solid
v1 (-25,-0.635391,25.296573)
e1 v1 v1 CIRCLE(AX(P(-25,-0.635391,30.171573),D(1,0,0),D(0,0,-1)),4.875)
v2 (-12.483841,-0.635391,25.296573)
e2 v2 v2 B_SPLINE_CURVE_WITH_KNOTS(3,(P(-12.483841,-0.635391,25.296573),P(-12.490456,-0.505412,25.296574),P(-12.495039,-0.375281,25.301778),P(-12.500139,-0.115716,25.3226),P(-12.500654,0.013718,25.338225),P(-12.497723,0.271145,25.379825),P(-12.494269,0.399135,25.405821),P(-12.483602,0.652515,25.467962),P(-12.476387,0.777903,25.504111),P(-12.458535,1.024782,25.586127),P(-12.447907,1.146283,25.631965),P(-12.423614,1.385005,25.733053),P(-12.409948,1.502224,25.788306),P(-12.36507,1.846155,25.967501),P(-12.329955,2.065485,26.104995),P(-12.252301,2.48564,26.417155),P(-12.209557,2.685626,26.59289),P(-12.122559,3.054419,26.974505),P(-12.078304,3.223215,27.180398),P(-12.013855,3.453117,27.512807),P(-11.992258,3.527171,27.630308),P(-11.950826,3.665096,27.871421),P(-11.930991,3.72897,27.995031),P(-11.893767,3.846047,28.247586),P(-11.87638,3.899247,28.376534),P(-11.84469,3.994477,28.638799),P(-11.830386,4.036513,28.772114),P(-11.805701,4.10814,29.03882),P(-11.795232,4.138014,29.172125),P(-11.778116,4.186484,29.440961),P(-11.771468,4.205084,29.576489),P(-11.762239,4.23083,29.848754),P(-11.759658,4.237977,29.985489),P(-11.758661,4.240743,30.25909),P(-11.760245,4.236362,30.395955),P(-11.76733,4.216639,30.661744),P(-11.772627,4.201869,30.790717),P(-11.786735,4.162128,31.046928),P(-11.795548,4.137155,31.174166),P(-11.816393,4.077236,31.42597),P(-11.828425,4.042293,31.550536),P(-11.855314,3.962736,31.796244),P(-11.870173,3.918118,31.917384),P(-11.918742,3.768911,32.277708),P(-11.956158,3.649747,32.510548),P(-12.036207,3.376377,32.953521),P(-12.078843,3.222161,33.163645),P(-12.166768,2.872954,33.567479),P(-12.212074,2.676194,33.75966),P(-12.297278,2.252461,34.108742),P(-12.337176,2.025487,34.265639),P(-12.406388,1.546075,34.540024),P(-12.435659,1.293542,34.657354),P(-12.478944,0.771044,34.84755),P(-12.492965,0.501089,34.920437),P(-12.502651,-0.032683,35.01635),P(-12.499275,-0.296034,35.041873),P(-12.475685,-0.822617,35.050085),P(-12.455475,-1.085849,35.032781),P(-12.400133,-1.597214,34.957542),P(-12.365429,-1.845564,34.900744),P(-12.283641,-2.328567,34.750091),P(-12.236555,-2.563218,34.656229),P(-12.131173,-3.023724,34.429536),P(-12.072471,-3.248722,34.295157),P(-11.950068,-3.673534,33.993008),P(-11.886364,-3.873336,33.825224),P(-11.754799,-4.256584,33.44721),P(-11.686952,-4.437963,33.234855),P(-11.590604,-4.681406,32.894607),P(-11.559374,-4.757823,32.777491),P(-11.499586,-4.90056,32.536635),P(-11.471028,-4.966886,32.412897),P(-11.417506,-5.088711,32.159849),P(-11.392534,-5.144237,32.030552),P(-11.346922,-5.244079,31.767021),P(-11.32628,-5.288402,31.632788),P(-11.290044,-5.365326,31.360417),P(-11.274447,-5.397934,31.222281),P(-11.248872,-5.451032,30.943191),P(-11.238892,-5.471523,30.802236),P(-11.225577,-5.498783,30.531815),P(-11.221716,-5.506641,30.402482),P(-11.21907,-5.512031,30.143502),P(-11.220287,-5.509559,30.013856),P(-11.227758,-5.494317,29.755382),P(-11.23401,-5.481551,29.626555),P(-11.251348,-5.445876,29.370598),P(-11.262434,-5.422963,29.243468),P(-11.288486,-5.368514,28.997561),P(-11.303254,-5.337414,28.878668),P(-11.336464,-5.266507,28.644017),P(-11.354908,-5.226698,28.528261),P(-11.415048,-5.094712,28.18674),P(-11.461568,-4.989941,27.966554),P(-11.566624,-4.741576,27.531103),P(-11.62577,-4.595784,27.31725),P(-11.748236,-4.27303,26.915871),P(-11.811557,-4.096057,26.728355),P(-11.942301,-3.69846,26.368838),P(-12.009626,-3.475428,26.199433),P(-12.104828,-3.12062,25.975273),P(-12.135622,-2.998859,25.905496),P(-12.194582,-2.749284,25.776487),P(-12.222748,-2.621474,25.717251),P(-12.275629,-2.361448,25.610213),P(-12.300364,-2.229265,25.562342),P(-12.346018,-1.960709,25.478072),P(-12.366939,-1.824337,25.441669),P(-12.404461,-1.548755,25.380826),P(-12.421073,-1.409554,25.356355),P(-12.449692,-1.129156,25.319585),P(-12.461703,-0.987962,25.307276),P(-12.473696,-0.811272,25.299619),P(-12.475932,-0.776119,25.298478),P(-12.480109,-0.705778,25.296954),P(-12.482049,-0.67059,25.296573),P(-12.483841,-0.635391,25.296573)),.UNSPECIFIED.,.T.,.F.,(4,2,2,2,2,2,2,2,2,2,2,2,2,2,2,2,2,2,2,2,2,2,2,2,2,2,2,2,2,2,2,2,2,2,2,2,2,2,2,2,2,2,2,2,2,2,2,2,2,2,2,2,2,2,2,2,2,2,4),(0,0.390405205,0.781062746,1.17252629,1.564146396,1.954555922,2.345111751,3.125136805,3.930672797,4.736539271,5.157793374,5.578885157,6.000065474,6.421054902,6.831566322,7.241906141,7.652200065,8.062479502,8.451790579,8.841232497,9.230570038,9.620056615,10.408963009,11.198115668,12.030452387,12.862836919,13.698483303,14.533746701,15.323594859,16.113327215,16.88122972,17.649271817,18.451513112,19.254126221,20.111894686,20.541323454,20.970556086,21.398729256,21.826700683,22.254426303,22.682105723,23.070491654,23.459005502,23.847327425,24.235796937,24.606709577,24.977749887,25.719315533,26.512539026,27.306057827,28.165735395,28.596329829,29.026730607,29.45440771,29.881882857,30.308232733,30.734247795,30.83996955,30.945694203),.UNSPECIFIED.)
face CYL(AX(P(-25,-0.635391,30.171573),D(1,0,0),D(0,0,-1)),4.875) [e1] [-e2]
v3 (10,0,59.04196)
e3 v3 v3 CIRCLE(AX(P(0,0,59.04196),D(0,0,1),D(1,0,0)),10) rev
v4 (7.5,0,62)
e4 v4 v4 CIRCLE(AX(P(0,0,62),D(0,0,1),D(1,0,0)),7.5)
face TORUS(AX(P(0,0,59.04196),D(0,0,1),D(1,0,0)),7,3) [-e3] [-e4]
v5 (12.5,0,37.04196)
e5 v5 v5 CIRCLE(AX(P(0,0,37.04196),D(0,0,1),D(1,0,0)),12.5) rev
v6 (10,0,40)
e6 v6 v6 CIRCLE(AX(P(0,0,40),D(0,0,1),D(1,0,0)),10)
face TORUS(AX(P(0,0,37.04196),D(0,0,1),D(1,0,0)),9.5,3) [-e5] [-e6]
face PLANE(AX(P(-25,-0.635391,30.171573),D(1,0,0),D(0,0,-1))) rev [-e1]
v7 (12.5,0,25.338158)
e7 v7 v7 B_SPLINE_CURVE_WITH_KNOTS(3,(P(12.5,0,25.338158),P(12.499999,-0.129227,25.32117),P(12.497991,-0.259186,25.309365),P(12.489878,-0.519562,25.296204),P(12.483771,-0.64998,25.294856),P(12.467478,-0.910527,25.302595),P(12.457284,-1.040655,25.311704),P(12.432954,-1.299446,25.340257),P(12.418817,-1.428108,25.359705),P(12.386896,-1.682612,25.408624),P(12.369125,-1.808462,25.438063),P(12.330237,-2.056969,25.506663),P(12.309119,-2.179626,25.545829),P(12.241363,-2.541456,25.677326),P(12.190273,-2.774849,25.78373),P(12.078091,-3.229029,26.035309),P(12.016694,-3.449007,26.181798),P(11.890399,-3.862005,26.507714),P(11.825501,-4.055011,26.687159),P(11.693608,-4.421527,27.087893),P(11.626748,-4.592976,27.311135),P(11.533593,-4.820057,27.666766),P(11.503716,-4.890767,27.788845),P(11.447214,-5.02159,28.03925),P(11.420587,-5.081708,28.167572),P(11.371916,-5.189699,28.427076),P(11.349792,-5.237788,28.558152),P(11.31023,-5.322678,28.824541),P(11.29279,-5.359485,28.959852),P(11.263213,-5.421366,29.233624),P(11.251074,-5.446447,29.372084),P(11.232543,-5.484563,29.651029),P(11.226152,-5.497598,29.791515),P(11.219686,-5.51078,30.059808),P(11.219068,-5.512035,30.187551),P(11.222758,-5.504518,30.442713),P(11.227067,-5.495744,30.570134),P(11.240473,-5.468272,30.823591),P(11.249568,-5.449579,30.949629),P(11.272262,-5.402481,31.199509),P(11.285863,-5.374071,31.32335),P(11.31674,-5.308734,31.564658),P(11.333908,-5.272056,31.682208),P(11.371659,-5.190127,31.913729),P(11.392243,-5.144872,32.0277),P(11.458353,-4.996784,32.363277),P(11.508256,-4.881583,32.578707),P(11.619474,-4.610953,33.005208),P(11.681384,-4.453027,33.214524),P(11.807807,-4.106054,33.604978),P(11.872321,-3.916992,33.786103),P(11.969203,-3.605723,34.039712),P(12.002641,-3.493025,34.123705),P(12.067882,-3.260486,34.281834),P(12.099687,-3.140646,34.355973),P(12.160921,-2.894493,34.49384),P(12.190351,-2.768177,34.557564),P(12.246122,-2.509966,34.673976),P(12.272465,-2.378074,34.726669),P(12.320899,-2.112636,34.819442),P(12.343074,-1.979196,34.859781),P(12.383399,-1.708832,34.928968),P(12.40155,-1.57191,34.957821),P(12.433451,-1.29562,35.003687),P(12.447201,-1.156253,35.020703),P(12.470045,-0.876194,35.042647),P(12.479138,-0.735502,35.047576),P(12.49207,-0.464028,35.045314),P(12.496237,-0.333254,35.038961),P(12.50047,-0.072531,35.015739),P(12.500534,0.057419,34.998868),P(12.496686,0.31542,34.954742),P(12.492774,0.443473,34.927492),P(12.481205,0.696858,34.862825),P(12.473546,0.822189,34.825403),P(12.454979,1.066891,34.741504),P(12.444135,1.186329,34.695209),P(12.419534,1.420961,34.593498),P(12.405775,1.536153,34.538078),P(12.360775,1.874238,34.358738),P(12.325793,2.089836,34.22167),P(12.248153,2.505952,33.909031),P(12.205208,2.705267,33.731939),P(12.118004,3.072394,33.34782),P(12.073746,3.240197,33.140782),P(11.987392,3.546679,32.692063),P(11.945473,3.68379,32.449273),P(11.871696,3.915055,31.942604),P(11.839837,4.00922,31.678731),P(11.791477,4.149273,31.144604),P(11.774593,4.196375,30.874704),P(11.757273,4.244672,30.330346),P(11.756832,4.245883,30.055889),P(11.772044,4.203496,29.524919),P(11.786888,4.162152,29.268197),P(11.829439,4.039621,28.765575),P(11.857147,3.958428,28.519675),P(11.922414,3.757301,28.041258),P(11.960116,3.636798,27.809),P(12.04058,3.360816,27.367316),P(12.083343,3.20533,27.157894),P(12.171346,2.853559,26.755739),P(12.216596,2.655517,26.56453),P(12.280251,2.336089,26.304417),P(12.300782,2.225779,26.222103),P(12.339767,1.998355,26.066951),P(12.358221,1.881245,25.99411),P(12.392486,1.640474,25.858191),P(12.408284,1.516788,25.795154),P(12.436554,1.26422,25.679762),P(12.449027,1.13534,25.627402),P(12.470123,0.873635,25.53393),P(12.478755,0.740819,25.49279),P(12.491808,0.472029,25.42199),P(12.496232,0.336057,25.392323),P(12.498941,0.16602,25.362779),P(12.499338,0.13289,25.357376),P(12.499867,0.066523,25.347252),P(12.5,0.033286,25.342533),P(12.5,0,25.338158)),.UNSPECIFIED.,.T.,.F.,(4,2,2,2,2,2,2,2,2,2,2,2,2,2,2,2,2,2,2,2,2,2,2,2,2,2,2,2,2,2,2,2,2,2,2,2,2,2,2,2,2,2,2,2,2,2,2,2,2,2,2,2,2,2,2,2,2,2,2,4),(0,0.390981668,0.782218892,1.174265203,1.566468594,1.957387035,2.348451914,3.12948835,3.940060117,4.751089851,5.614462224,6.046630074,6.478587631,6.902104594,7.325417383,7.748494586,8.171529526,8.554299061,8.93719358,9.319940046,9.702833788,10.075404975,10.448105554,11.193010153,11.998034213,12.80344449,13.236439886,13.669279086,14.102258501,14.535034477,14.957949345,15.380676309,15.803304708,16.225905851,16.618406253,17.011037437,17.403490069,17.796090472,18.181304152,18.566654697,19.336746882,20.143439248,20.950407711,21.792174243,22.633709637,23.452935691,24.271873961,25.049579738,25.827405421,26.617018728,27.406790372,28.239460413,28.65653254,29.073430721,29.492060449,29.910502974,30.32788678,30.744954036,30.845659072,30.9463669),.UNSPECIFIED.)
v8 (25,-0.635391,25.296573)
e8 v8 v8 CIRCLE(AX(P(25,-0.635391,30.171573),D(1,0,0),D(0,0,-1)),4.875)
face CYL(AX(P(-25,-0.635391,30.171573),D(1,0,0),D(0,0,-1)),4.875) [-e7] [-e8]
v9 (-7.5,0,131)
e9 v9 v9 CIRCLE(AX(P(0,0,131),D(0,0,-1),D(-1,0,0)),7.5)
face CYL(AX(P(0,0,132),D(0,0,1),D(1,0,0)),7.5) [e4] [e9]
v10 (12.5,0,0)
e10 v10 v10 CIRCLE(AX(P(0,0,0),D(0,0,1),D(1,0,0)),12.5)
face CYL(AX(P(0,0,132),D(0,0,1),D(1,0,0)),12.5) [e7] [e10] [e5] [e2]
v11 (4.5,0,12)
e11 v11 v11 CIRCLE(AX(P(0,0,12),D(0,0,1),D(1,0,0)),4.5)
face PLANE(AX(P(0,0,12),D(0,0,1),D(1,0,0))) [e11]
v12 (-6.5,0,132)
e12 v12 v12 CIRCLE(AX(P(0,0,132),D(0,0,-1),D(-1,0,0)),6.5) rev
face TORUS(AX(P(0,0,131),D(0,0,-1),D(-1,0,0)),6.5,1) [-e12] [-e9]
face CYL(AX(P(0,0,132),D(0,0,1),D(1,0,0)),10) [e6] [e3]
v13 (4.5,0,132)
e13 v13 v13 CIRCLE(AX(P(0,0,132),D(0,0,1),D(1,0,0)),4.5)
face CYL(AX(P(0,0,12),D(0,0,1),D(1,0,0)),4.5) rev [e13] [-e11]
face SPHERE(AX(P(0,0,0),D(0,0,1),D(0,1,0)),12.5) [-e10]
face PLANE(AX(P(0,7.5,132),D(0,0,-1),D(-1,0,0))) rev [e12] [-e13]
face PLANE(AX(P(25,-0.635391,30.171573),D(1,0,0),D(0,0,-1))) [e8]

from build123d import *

# Parameters (mm, degrees)
FILLET2_R                = 3
BOSS_EXTRUDE1_DEPTH      = 25
BOSS_EXTRUDE1_DEPTH_BACK = 25
SKETCH3_R                = 4.875
SKETCH2_R                = 4.5
CUT_EXTRUDE2_DEPTH       = 120
FILLET3_R                = 1


with BuildPart() as part:
    # Sketch1 → Revolve1 (revolve)
    with BuildSketch(Plane(origin=(0, 0, 0), x_dir=(0, 0, -1), z_dir=(1, 0, 0)), mode=Mode.PRIVATE) as revolve1_sk:
        with BuildLine():
            Line((0, 12.5), (-40, 12.5))
            Line((-40, 12.5), (-40, 10))
            Line((-40, 10), (-62, 10))
            Line((-62, 10), (-62, 7.5))
            Line((-62, 7.5), (-132, 7.5))
            Line((-132, 7.5), (-132, 0))
            Line((-132, 0), (12.5, 0))
            ThreePointArc((12.5, 0), (8.838834765, 8.838834765), (0, 12.5))
        make_face()
    revolve(revolve1_sk.sketch.rotate(Axis((0, 0, 132), (0, 0, -1)), 90), axis=Axis((0, 0, 132), (0, 0, -1)))

    # Fillet2
    # the kernel refuses this fillet: 3 mm, written as the material it takes off along each edge
    with BuildSketch(Plane(origin=(0, 0, 40), x_dir=(1, 0, 0), z_dir=(0, 1, 0))) as fillet2_piece_1:
        with BuildLine():
            CenterArc((9.5, 2.958039892), FILLET2_R, 279.594068227, 80.405931773)
            Line((10, 0), (10.01, -0.059160798))
            ThreePointArc((10.01, -0.059160798), (11.25, -0.06), (12.5, -0.06))
            Line((12.5, -0.06), (12.56, 0))
            Line((12.56, 0), (12.56, 2.958039892))
            Line((12.56, 2.958039892), (12.5, 2.958039892))
        make_face()
    revolve(axis=Axis((0, 0, 40), (0, 0, -1)), mode=Mode.SUBTRACT)
    with BuildSketch(Plane(origin=(0, 0, 62), x_dir=(1, 0, 0), z_dir=(0, 1, 0))) as fillet2_piece_2:
        with BuildLine():
            CenterArc((7, 2.958039892), FILLET2_R, 279.594068227, 80.405931773)
            Line((7.5, 0), (7.51, -0.059160798))
            ThreePointArc((7.51, -0.059160798), (8.75, -0.06), (10, -0.06))
            Line((10, -0.06), (10.06, 0))
            Line((10.06, 0), (10.06, 2.958039892))
            Line((10.06, 2.958039892), (10, 2.958039892))
        make_face()
    revolve(axis=Axis((0, 0, 62), (0, 0, -1)), mode=Mode.SUBTRACT)

    # Sketch3 → Boss-Extrude1 (add, two sides: drawn at the far end of the back side and taken through both)
    with BuildSketch(Plane(origin=(0, 0, 0), x_dir=(0, 0, -1), z_dir=(1, 0, 0)).offset(-BOSS_EXTRUDE1_DEPTH_BACK)):
        with Locations((-30.171572875, -0.635390854)):
            Circle(SKETCH3_R)
    extrude(amount=BOSS_EXTRUDE1_DEPTH + BOSS_EXTRUDE1_DEPTH_BACK)

    # Sketch2 → Cut-Extrude2 (cut)
    with BuildSketch(Plane.XY.offset(132)):
        Circle(SKETCH2_R)
    extrude(amount=-CUT_EXTRUDE2_DEPTH, mode=Mode.SUBTRACT)

    # Fillet3
    fillet3_edges = [part.edges().sort_by_distance(p)[0] for p in [
        (-7.5, 0, 132),
    ]]
    fillet(fillet3_edges, radius=FILLET3_R)


solid = part.part
